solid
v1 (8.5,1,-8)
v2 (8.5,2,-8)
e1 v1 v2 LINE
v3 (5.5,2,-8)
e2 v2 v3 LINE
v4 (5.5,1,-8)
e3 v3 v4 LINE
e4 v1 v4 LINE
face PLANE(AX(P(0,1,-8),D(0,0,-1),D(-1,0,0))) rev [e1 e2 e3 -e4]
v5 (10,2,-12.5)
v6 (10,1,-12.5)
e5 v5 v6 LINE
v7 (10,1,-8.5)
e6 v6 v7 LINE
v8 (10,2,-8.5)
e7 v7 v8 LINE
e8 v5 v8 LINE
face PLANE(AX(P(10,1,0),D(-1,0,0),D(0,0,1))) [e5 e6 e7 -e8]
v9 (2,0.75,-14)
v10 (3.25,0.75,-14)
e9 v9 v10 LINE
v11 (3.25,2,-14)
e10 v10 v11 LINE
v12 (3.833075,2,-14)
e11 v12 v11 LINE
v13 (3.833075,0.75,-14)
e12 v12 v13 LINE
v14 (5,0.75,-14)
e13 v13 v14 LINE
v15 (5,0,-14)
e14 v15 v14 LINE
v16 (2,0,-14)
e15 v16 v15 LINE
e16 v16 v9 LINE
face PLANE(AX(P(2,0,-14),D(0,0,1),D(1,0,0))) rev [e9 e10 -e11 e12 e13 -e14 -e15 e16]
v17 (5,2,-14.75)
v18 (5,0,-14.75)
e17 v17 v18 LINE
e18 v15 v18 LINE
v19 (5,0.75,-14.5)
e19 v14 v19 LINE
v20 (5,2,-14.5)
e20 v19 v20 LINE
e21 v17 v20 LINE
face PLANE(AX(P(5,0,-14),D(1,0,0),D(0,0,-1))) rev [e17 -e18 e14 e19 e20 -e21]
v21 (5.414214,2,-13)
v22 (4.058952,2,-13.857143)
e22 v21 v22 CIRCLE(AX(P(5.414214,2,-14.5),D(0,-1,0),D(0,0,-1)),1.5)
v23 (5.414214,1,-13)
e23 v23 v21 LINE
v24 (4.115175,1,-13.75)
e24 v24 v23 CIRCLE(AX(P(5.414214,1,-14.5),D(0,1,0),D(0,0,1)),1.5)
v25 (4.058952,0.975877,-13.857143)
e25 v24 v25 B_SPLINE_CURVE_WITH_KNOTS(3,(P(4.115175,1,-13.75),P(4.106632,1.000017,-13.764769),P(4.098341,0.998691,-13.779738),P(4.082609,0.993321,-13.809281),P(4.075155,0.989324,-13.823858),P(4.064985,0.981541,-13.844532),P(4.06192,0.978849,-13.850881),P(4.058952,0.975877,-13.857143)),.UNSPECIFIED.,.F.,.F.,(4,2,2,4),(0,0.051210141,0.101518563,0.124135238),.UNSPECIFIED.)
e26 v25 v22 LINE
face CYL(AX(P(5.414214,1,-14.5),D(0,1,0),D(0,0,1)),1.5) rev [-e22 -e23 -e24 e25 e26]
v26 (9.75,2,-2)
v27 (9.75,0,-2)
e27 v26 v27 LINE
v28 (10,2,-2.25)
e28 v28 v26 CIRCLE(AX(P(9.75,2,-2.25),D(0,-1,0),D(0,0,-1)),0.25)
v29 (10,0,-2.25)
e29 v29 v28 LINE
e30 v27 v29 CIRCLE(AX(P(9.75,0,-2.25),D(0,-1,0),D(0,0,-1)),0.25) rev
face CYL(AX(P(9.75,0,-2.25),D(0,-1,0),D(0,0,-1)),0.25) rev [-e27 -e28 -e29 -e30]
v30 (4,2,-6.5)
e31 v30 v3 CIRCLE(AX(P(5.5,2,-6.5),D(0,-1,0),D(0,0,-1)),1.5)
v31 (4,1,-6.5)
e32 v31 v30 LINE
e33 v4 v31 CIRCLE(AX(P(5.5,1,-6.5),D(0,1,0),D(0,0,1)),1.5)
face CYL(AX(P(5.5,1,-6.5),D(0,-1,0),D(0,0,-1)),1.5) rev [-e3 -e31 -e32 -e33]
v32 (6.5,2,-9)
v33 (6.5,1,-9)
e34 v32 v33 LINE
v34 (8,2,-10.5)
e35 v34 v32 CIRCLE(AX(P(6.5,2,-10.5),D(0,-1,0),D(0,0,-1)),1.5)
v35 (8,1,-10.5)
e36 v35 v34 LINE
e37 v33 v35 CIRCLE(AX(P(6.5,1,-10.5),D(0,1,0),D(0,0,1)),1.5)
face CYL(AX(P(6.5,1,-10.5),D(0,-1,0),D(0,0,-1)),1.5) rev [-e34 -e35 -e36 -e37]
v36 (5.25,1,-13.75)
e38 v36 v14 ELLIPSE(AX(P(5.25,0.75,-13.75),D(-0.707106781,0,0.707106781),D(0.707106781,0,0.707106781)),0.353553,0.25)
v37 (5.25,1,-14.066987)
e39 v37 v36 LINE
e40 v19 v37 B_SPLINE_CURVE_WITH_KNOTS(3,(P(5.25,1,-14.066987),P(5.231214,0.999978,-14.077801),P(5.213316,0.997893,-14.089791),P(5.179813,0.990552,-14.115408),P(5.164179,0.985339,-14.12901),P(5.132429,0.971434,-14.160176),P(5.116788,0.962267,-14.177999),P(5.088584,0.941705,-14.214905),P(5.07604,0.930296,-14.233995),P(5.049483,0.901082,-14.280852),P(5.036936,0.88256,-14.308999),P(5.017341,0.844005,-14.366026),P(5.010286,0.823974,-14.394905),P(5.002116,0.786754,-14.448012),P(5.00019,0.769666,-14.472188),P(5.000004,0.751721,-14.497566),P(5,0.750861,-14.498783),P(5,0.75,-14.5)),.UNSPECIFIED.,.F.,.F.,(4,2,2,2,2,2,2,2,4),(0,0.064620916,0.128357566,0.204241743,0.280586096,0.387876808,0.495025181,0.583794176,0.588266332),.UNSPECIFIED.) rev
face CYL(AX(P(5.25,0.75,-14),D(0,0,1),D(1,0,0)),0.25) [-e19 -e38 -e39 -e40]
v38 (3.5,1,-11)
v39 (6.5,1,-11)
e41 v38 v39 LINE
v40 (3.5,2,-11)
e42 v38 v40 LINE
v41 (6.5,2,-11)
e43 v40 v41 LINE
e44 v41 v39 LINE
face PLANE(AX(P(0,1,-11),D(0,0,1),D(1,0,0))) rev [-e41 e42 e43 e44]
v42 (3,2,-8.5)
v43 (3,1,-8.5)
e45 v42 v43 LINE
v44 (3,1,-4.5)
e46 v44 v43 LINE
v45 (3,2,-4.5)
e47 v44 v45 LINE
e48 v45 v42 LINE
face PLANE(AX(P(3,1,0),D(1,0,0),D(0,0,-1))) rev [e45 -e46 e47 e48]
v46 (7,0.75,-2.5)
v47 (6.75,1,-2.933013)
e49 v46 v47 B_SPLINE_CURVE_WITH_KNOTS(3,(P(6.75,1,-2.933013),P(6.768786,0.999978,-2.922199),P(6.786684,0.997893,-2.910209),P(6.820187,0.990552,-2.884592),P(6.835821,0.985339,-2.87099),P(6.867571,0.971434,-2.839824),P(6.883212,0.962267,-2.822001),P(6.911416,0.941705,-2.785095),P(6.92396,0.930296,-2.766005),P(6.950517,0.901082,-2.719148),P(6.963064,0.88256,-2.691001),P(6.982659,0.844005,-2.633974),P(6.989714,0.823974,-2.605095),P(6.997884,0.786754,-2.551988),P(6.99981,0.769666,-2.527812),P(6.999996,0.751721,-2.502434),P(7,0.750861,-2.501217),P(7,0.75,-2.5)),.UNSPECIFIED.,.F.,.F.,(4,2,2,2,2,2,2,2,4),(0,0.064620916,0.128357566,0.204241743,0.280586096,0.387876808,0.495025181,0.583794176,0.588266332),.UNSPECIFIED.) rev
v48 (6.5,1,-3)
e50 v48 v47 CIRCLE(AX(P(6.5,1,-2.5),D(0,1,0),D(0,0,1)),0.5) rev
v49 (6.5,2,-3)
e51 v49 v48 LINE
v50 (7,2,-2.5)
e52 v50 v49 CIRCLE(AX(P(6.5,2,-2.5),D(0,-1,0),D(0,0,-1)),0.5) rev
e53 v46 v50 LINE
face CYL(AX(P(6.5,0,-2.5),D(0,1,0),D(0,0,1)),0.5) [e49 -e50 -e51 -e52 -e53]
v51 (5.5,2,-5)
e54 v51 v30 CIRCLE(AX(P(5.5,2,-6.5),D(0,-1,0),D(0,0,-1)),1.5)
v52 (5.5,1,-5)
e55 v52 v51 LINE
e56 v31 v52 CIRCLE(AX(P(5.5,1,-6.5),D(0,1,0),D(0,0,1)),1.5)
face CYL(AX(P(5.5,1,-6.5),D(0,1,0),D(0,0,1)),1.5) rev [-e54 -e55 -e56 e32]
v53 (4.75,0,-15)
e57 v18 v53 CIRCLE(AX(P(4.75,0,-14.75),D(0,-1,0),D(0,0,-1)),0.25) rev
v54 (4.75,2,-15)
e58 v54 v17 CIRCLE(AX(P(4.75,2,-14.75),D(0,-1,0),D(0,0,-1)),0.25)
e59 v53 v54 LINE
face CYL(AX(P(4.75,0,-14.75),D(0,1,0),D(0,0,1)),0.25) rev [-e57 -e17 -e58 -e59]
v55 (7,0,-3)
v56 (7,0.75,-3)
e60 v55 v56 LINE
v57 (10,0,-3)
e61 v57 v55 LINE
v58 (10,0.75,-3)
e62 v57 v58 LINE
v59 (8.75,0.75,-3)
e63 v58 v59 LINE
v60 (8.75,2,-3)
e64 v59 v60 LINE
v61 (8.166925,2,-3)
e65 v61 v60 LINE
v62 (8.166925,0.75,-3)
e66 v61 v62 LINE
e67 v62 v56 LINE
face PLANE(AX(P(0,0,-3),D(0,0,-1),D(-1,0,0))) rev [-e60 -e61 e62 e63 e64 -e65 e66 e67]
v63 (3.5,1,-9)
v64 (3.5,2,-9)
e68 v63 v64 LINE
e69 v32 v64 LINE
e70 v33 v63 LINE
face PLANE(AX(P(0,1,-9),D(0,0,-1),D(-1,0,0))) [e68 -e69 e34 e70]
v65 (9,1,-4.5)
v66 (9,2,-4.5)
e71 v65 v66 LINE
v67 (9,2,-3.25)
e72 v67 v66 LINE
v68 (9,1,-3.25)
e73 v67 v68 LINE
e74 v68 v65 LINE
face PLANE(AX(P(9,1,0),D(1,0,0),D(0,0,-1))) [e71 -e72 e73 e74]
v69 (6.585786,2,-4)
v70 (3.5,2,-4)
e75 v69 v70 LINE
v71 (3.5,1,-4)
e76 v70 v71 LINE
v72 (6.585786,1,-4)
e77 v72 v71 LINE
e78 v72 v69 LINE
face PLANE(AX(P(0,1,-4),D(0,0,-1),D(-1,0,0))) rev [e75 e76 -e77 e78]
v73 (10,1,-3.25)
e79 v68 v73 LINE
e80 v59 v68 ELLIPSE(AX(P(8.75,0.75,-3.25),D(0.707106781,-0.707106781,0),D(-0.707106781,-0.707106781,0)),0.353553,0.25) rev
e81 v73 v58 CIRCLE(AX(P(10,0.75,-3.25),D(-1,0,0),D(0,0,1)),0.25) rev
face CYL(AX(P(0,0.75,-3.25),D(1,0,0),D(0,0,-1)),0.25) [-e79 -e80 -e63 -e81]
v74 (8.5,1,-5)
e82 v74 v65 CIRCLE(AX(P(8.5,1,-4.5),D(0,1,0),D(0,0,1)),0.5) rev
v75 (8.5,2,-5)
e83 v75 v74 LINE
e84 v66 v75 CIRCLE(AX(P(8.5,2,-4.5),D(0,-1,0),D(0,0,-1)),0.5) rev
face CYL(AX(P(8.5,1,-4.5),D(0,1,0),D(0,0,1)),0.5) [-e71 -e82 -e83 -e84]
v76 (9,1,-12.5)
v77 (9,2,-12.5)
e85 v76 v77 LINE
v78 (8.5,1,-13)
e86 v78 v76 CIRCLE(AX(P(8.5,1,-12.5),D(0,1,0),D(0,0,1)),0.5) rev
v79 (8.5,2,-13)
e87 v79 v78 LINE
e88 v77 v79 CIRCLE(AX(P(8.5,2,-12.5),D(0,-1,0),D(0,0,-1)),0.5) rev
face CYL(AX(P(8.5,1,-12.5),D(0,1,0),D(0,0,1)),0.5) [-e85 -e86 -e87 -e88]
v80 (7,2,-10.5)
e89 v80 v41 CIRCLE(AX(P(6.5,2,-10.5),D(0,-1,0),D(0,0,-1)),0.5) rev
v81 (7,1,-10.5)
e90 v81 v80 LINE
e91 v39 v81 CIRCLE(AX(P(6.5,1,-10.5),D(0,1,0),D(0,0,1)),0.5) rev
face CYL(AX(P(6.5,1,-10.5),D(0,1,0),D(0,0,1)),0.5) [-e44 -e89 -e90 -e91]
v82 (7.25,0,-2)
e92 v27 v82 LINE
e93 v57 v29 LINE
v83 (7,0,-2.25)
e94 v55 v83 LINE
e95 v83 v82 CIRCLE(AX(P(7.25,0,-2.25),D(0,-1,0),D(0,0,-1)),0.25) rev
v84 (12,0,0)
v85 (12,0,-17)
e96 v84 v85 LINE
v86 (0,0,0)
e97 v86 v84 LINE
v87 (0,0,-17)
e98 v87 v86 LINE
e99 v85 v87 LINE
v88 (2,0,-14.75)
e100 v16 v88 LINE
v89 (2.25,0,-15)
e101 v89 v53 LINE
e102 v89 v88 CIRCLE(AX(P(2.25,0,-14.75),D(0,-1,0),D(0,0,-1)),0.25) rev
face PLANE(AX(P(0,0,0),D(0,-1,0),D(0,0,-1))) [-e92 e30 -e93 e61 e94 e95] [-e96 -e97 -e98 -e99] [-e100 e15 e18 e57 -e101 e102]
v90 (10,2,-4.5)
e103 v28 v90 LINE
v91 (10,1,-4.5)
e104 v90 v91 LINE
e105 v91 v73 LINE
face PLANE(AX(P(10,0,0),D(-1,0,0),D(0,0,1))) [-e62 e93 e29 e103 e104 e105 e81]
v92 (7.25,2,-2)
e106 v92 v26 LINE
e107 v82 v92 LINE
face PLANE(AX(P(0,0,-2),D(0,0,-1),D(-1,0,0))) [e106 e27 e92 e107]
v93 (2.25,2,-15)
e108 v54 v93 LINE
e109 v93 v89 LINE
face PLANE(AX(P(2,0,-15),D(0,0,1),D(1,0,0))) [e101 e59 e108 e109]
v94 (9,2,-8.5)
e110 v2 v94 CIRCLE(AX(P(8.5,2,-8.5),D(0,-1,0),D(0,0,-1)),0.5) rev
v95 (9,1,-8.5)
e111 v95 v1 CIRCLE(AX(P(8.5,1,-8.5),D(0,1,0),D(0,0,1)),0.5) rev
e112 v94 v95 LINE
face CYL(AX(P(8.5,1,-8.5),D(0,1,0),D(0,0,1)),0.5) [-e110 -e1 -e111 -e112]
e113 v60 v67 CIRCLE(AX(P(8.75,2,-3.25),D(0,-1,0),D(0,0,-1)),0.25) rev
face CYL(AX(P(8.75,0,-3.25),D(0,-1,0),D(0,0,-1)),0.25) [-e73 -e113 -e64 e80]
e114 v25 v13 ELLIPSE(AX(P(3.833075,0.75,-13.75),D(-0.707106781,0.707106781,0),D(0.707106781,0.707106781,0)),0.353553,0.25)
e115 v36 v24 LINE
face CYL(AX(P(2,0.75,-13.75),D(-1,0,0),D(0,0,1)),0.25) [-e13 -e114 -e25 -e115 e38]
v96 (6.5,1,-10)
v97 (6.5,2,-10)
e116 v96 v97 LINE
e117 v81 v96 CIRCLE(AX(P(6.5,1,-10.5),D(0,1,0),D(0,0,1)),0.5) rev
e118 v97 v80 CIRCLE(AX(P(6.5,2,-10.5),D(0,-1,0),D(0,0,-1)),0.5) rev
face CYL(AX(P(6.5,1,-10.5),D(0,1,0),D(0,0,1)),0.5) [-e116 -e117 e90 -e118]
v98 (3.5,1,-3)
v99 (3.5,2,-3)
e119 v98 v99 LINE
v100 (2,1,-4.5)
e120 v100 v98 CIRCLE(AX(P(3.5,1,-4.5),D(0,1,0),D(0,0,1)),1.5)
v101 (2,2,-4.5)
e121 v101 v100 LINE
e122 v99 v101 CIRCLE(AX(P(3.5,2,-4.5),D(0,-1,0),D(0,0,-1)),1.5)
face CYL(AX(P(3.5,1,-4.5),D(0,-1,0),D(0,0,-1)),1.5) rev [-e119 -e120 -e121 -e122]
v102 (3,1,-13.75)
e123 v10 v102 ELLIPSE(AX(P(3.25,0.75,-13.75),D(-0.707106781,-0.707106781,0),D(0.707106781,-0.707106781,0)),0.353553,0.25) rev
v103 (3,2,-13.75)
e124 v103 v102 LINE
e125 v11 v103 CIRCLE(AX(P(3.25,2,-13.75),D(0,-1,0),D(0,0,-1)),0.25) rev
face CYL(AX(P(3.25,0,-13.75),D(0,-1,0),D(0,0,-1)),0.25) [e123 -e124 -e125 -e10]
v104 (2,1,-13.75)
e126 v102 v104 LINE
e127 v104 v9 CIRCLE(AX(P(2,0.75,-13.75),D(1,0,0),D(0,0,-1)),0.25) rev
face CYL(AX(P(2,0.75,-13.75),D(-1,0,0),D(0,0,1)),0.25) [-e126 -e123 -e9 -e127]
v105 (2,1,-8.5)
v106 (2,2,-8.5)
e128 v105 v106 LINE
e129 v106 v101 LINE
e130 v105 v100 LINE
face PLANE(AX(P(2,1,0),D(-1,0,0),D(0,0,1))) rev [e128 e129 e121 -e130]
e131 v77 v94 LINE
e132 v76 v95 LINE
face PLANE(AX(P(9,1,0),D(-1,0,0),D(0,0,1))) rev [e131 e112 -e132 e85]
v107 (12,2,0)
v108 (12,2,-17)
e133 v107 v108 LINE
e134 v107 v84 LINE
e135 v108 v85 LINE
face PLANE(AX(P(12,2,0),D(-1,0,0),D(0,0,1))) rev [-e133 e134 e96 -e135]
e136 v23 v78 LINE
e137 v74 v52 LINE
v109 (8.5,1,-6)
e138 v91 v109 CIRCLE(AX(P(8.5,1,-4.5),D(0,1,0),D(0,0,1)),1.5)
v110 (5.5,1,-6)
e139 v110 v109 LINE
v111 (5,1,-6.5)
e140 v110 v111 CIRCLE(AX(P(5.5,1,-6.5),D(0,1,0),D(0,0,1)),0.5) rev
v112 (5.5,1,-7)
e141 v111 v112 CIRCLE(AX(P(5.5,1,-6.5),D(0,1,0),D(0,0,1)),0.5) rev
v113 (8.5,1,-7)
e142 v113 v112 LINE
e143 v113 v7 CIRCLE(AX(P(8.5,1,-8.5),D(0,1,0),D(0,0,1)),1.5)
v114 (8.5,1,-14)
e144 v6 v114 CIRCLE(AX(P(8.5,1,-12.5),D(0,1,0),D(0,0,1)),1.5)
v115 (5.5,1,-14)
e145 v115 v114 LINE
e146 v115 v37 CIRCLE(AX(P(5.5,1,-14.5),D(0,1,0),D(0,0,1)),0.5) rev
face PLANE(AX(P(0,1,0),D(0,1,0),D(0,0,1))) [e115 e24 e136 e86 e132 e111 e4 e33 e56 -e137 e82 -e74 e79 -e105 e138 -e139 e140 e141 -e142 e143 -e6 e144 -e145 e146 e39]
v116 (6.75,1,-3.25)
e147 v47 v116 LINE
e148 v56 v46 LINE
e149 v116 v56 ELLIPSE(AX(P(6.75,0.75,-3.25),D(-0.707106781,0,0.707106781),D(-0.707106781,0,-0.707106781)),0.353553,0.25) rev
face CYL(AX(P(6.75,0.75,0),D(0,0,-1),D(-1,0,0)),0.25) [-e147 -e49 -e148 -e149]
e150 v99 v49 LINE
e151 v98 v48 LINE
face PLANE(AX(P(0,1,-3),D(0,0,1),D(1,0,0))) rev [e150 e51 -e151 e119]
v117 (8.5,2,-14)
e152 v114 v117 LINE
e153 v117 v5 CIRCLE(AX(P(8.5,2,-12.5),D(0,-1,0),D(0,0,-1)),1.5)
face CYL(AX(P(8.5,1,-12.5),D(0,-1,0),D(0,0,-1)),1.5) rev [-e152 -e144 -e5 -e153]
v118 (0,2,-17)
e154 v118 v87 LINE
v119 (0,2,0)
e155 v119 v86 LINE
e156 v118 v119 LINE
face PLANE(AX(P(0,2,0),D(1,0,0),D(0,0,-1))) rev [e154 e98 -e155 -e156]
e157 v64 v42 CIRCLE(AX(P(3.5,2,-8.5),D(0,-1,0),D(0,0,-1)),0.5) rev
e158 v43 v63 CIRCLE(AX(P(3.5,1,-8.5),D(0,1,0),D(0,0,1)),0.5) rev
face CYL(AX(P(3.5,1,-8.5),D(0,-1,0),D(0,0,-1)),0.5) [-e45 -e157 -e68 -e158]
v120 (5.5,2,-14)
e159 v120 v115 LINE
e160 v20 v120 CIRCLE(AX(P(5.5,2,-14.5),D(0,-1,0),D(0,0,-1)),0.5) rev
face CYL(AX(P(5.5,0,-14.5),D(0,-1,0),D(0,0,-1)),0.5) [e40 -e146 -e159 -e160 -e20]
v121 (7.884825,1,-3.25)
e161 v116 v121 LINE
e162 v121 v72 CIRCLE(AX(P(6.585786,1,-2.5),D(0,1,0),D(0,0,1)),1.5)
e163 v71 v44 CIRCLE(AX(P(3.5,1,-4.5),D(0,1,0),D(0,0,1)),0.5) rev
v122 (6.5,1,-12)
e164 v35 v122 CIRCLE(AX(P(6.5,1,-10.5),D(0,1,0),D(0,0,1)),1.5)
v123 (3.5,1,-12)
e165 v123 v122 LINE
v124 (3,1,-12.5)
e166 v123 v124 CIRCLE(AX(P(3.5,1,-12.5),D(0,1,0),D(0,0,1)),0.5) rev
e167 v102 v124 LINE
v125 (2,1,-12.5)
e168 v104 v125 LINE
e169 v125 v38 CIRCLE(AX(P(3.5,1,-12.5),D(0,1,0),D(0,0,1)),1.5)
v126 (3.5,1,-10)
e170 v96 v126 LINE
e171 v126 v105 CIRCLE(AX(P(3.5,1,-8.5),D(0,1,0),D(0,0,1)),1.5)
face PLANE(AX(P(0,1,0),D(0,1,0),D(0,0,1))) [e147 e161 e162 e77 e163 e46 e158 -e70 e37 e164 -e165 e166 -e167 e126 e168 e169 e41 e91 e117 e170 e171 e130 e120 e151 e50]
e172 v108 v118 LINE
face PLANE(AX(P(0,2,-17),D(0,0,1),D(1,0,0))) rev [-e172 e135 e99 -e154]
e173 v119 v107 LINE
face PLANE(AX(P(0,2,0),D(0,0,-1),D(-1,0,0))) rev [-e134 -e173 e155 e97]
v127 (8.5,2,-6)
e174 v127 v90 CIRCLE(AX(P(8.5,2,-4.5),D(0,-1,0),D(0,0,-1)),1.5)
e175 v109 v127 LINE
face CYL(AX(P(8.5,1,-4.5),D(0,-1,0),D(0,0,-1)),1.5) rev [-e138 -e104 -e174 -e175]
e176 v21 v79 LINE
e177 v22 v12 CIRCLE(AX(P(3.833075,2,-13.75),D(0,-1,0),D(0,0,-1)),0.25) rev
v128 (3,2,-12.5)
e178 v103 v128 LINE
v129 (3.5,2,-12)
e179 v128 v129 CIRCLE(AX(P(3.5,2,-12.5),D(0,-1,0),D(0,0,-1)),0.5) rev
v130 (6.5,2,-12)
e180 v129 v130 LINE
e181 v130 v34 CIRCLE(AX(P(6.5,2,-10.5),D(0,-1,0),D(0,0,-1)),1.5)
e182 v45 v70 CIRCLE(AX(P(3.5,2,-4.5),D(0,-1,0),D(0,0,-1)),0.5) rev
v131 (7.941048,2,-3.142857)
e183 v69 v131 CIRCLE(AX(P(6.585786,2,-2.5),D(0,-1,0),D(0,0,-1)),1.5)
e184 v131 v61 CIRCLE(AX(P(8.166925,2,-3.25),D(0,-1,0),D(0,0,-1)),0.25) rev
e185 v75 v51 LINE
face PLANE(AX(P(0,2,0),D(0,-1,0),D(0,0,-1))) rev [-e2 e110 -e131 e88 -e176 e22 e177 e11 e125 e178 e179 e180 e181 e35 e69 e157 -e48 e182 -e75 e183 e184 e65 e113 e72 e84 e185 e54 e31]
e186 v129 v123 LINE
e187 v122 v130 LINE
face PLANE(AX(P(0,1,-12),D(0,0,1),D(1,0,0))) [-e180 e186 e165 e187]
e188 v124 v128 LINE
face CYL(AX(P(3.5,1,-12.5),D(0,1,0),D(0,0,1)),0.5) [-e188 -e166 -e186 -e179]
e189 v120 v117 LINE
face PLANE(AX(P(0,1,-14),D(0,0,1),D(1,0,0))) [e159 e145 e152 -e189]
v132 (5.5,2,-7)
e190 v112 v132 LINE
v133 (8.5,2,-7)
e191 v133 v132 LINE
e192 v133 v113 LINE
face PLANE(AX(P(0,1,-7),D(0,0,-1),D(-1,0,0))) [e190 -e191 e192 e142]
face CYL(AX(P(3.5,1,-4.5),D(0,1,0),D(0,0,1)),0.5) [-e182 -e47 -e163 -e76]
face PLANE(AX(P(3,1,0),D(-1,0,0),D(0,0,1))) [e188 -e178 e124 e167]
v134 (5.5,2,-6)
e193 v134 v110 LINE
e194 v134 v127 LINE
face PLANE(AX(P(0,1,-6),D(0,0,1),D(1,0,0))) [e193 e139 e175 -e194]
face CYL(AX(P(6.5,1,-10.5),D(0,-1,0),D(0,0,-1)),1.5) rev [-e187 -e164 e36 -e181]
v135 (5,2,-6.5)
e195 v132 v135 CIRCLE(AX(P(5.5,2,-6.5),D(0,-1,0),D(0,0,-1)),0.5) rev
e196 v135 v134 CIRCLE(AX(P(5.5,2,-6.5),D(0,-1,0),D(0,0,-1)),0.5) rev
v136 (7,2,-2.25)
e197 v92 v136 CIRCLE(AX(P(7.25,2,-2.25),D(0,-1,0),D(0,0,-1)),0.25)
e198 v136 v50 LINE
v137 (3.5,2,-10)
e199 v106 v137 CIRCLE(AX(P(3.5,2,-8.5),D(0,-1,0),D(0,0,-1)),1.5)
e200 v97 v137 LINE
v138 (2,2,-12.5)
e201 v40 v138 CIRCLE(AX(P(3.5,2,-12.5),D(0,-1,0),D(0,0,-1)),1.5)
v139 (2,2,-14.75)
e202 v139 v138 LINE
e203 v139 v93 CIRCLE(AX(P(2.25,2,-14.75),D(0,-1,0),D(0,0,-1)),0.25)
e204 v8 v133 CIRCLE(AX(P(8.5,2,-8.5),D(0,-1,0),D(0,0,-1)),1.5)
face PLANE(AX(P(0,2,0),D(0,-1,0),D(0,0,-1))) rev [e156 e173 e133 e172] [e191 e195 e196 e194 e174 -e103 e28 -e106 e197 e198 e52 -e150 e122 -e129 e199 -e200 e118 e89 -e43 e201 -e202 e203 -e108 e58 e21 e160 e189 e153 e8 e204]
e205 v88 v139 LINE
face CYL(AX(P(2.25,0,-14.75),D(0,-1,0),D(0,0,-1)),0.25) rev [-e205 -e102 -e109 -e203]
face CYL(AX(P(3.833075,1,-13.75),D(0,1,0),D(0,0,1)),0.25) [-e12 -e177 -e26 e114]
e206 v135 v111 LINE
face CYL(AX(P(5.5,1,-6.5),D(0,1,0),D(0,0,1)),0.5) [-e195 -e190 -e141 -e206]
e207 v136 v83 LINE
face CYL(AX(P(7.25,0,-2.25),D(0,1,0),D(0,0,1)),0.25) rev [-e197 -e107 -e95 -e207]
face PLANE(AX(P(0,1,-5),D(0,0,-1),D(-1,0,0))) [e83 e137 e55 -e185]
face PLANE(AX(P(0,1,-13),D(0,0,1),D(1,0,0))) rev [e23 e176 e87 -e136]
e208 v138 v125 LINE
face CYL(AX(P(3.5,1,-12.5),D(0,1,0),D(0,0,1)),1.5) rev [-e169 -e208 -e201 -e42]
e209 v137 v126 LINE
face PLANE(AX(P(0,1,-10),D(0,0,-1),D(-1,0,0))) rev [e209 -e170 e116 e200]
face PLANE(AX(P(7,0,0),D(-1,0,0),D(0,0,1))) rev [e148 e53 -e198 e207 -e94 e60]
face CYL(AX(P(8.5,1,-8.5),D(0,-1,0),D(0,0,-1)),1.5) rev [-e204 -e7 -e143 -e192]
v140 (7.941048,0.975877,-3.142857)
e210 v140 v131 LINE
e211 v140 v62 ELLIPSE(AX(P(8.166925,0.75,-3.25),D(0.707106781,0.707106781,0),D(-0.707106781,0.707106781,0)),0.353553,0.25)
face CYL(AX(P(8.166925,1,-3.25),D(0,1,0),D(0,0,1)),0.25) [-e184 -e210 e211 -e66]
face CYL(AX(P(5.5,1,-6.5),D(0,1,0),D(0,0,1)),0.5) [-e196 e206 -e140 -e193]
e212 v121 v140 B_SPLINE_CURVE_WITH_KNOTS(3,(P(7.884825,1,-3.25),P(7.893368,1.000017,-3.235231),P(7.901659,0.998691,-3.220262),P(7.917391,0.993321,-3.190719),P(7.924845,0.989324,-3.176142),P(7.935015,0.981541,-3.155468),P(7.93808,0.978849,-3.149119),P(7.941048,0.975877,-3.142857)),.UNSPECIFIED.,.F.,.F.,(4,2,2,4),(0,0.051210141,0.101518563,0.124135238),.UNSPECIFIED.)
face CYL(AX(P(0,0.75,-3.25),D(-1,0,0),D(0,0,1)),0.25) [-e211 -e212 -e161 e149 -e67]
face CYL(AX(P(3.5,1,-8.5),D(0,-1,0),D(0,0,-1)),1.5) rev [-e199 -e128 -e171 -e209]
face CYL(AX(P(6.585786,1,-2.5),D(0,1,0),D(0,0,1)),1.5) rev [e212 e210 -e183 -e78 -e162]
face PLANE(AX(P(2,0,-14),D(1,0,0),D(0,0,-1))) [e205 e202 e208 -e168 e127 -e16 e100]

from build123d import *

# Parameters (mm, degrees)
SKIZZE1_W                            = 12
SKIZZE1_H                            = 17
AUFSATZ_LINEAR_AUSTRAGEN1_DEPTH      = 2
SCHNITT_LINEAR_AUSTRAGEN1_DEPTH      = 21.90454496
SCHNITT_LINEAR_AUSTRAGEN1_DEPTH_BACK = 21.90454496
SKIZZE4_W                            = 3
SKIZZE4_H                            = 1
SCHNITT_LINEAR_AUSTRAGEN3_DEPTH      = 1
VERRUNDUNG1_R                        = 0.5
VERRUNDUNG2_R                        = 1.5
VERRUNDUNG3_R                        = 0.25


# Some blends are built 0.0001 mm under size
with BuildPart() as part:
    # Skizze1 → Aufsatz-Linear austragen1 (new body)
    with BuildSketch(Plane(origin=(0, 0, 0), x_dir=(1, 0, 0), z_dir=(0, 1, 0))):
        with Locations((6, 8.5)):
            Rectangle(SKIZZE1_W, SKIZZE1_H)
    extrude(amount=AUFSATZ_LINEAR_AUSTRAGEN1_DEPTH)

    # Skizze4 → Schnitt-Linear austragen1 (cut, two sides: drawn at the far end of the back side and taken through both)
    with BuildSketch(Plane(origin=(0, 2, 0), x_dir=(1, 0, 0), z_dir=(0, 1, 0)).offset(-SCHNITT_LINEAR_AUSTRAGEN1_DEPTH_BACK)):
        with Locations((8.5, 2.5)):
            Rectangle(SKIZZE4_W, SKIZZE4_H)
        with Locations((3.5, 14.5)):
            Rectangle(SKIZZE4_W, SKIZZE4_H)
    extrude(amount=SCHNITT_LINEAR_AUSTRAGEN1_DEPTH + SCHNITT_LINEAR_AUSTRAGEN1_DEPTH_BACK, mode=Mode.SUBTRACT)

    # Skizze3 → Schnitt-Linear austragen3 (cut)
    with BuildSketch(Plane(origin=(0, 2, 0), x_dir=(1, 0, 0), z_dir=(0, 1, 0))):
        Polygon((8, 4), (3, 4), (3, 9), (8, 9), (8, 12), (3, 12), (3, 14), (2, 14), (2, 11), (7, 11), (7, 10), (2, 10), (2, 3), (8, 3), align=None)
        Polygon((9, 5), (4, 5), (4, 8), (9, 8), (9, 13), (4, 13), (4, 14), (10, 14), (10, 7), (5, 7), (5, 6), (10, 6), (10, 3), (9, 3), align=None)
    extrude(amount=-SCHNITT_LINEAR_AUSTRAGEN3_DEPTH, mode=Mode.SUBTRACT)

    # Verrundung1
    verrundung1_edges = [part.edges().sort_by_distance(p)[0] for p in [
        (3, 1.5, -12),
        (3, 1.5, -9),
        (7, 1.5, -3),
        (5, 1.5, -14),
        (9, 1.5, -5),
        (9, 1.5, -8),
        (9, 1.5, -13),
        (5, 1.5, -7),
        (5, 1.5, -6),
        (3, 1.5, -4),
        (7, 1.5, -10),
        (7, 1.5, -11),
    ]]
    fillet(verrundung1_edges, radius=VERRUNDUNG1_R - 0.0001)  # a hair under: the kernel refuses the full size

    # Verrundung2
    # the kernel refuses this fillet: 1.5 mm, written as the material it adds along each edge
    with BuildSketch(Plane(origin=(4, 2, -8), x_dir=(0, 0, 1), z_dir=(0, -1, 0)), Plane(origin=(2, 2, -11), x_dir=(1, 0, 0), z_dir=(0, -1, 0)), Plane(origin=(2, 2, -3), x_dir=(1, 0, 0), z_dir=(0, -1, 0)), Plane(origin=(2, 2, -10), x_dir=(0, 0, 1), z_dir=(0, -1, 0)), Plane(origin=(4, 2, -5), x_dir=(1, 0, 0), z_dir=(0, -1, 0))) as verrundung2_piece_1:
        with BuildLine():
            CenterArc((VERRUNDUNG2_R, -VERRUNDUNG2_R), VERRUNDUNG2_R, 90, 90)
            Line((0, -VERRUNDUNG2_R), (-VERRUNDUNG2_R * 0.02, -VERRUNDUNG2_R))
            Line((-VERRUNDUNG2_R * 0.02, -VERRUNDUNG2_R), (-VERRUNDUNG2_R * 0.02, VERRUNDUNG2_R * 0.02))
            Line((-VERRUNDUNG2_R * 0.02, VERRUNDUNG2_R * 0.02), (VERRUNDUNG2_R, VERRUNDUNG2_R * 0.02))
            Line((VERRUNDUNG2_R, VERRUNDUNG2_R * 0.02), (VERRUNDUNG2_R, 0))
        make_face()
    extrude(amount=1)
    with BuildSketch(Plane(origin=(8, 2, -4), x_dir=(-1, 0, 0), z_dir=(0, -1, 0)), Plane(origin=(4, 2, -13), x_dir=(1, 0, 0), z_dir=(0, -1, 0))) as verrundung2_piece_2:
        with BuildLine():
            CenterArc((1.414213562, -1.5), VERRUNDUNG2_R, 90, 70.528779366)
            Line((0, -1), (-0.028284271, -0.99))
            ThreePointArc((-0.028284271, -0.99), (-0.03, -0.5), (-0.03, 0))
            Line((-0.03, 0), (0, 0.03))
            Line((0, 0.03), (1.414213562, 0.03))
            Line((1.414213562, 0.03), (1.414213562, 0))
        make_face()
    extrude(amount=1)
    with BuildSketch(Plane(origin=(10, 2, -14), x_dir=(0, 0, 1), z_dir=(0, -1, 0)), Plane(origin=(10, 2, -7), x_dir=(-1, 0, 0), z_dir=(0, -1, 0)), Plane(origin=(10, 2, -6), x_dir=(0, 0, 1), z_dir=(0, -1, 0)), Plane(origin=(8, 2, -12), x_dir=(0, 0, 1), z_dir=(0, -1, 0)), Plane(origin=(8, 2, -9), x_dir=(-1, 0, 0), z_dir=(0, -1, 0))) as verrundung2_piece_3:
        with BuildLine():
            CenterArc((VERRUNDUNG2_R, VERRUNDUNG2_R), VERRUNDUNG2_R, 180, 90)
            Line((0, VERRUNDUNG2_R), (-VERRUNDUNG2_R * 0.02, VERRUNDUNG2_R))
            Line((-VERRUNDUNG2_R * 0.02, VERRUNDUNG2_R), (-VERRUNDUNG2_R * 0.02, -VERRUNDUNG2_R * 0.02))
            Line((-VERRUNDUNG2_R * 0.02, -VERRUNDUNG2_R * 0.02), (VERRUNDUNG2_R, -VERRUNDUNG2_R * 0.02))
            Line((VERRUNDUNG2_R, -VERRUNDUNG2_R * 0.02), (VERRUNDUNG2_R, 0))
        make_face()
    extrude(amount=1)

    # Verrundung3
    verrundung3_edges = [part.edges().sort_by_distance(p)[0] for p in [
        (3, 1.5, -14),
        (2.5, 1, -14),
        (5, 1, -14.24995),
        (7, 1, -2.75005),
        (10, 1, -2),
        (7, 1, -2),
        (2, 1, -15),
        (5, 1, -15),
        (4, 1.5, -14),
        (9, 1.5, -3),
        (4.5, 1, -14),
        (9.5, 1, -3),
        (7.5, 1, -3),
        (8, 1.5, -3),
    ]]
    fillet(verrundung3_edges, radius=VERRUNDUNG3_R)


solid = part.part
